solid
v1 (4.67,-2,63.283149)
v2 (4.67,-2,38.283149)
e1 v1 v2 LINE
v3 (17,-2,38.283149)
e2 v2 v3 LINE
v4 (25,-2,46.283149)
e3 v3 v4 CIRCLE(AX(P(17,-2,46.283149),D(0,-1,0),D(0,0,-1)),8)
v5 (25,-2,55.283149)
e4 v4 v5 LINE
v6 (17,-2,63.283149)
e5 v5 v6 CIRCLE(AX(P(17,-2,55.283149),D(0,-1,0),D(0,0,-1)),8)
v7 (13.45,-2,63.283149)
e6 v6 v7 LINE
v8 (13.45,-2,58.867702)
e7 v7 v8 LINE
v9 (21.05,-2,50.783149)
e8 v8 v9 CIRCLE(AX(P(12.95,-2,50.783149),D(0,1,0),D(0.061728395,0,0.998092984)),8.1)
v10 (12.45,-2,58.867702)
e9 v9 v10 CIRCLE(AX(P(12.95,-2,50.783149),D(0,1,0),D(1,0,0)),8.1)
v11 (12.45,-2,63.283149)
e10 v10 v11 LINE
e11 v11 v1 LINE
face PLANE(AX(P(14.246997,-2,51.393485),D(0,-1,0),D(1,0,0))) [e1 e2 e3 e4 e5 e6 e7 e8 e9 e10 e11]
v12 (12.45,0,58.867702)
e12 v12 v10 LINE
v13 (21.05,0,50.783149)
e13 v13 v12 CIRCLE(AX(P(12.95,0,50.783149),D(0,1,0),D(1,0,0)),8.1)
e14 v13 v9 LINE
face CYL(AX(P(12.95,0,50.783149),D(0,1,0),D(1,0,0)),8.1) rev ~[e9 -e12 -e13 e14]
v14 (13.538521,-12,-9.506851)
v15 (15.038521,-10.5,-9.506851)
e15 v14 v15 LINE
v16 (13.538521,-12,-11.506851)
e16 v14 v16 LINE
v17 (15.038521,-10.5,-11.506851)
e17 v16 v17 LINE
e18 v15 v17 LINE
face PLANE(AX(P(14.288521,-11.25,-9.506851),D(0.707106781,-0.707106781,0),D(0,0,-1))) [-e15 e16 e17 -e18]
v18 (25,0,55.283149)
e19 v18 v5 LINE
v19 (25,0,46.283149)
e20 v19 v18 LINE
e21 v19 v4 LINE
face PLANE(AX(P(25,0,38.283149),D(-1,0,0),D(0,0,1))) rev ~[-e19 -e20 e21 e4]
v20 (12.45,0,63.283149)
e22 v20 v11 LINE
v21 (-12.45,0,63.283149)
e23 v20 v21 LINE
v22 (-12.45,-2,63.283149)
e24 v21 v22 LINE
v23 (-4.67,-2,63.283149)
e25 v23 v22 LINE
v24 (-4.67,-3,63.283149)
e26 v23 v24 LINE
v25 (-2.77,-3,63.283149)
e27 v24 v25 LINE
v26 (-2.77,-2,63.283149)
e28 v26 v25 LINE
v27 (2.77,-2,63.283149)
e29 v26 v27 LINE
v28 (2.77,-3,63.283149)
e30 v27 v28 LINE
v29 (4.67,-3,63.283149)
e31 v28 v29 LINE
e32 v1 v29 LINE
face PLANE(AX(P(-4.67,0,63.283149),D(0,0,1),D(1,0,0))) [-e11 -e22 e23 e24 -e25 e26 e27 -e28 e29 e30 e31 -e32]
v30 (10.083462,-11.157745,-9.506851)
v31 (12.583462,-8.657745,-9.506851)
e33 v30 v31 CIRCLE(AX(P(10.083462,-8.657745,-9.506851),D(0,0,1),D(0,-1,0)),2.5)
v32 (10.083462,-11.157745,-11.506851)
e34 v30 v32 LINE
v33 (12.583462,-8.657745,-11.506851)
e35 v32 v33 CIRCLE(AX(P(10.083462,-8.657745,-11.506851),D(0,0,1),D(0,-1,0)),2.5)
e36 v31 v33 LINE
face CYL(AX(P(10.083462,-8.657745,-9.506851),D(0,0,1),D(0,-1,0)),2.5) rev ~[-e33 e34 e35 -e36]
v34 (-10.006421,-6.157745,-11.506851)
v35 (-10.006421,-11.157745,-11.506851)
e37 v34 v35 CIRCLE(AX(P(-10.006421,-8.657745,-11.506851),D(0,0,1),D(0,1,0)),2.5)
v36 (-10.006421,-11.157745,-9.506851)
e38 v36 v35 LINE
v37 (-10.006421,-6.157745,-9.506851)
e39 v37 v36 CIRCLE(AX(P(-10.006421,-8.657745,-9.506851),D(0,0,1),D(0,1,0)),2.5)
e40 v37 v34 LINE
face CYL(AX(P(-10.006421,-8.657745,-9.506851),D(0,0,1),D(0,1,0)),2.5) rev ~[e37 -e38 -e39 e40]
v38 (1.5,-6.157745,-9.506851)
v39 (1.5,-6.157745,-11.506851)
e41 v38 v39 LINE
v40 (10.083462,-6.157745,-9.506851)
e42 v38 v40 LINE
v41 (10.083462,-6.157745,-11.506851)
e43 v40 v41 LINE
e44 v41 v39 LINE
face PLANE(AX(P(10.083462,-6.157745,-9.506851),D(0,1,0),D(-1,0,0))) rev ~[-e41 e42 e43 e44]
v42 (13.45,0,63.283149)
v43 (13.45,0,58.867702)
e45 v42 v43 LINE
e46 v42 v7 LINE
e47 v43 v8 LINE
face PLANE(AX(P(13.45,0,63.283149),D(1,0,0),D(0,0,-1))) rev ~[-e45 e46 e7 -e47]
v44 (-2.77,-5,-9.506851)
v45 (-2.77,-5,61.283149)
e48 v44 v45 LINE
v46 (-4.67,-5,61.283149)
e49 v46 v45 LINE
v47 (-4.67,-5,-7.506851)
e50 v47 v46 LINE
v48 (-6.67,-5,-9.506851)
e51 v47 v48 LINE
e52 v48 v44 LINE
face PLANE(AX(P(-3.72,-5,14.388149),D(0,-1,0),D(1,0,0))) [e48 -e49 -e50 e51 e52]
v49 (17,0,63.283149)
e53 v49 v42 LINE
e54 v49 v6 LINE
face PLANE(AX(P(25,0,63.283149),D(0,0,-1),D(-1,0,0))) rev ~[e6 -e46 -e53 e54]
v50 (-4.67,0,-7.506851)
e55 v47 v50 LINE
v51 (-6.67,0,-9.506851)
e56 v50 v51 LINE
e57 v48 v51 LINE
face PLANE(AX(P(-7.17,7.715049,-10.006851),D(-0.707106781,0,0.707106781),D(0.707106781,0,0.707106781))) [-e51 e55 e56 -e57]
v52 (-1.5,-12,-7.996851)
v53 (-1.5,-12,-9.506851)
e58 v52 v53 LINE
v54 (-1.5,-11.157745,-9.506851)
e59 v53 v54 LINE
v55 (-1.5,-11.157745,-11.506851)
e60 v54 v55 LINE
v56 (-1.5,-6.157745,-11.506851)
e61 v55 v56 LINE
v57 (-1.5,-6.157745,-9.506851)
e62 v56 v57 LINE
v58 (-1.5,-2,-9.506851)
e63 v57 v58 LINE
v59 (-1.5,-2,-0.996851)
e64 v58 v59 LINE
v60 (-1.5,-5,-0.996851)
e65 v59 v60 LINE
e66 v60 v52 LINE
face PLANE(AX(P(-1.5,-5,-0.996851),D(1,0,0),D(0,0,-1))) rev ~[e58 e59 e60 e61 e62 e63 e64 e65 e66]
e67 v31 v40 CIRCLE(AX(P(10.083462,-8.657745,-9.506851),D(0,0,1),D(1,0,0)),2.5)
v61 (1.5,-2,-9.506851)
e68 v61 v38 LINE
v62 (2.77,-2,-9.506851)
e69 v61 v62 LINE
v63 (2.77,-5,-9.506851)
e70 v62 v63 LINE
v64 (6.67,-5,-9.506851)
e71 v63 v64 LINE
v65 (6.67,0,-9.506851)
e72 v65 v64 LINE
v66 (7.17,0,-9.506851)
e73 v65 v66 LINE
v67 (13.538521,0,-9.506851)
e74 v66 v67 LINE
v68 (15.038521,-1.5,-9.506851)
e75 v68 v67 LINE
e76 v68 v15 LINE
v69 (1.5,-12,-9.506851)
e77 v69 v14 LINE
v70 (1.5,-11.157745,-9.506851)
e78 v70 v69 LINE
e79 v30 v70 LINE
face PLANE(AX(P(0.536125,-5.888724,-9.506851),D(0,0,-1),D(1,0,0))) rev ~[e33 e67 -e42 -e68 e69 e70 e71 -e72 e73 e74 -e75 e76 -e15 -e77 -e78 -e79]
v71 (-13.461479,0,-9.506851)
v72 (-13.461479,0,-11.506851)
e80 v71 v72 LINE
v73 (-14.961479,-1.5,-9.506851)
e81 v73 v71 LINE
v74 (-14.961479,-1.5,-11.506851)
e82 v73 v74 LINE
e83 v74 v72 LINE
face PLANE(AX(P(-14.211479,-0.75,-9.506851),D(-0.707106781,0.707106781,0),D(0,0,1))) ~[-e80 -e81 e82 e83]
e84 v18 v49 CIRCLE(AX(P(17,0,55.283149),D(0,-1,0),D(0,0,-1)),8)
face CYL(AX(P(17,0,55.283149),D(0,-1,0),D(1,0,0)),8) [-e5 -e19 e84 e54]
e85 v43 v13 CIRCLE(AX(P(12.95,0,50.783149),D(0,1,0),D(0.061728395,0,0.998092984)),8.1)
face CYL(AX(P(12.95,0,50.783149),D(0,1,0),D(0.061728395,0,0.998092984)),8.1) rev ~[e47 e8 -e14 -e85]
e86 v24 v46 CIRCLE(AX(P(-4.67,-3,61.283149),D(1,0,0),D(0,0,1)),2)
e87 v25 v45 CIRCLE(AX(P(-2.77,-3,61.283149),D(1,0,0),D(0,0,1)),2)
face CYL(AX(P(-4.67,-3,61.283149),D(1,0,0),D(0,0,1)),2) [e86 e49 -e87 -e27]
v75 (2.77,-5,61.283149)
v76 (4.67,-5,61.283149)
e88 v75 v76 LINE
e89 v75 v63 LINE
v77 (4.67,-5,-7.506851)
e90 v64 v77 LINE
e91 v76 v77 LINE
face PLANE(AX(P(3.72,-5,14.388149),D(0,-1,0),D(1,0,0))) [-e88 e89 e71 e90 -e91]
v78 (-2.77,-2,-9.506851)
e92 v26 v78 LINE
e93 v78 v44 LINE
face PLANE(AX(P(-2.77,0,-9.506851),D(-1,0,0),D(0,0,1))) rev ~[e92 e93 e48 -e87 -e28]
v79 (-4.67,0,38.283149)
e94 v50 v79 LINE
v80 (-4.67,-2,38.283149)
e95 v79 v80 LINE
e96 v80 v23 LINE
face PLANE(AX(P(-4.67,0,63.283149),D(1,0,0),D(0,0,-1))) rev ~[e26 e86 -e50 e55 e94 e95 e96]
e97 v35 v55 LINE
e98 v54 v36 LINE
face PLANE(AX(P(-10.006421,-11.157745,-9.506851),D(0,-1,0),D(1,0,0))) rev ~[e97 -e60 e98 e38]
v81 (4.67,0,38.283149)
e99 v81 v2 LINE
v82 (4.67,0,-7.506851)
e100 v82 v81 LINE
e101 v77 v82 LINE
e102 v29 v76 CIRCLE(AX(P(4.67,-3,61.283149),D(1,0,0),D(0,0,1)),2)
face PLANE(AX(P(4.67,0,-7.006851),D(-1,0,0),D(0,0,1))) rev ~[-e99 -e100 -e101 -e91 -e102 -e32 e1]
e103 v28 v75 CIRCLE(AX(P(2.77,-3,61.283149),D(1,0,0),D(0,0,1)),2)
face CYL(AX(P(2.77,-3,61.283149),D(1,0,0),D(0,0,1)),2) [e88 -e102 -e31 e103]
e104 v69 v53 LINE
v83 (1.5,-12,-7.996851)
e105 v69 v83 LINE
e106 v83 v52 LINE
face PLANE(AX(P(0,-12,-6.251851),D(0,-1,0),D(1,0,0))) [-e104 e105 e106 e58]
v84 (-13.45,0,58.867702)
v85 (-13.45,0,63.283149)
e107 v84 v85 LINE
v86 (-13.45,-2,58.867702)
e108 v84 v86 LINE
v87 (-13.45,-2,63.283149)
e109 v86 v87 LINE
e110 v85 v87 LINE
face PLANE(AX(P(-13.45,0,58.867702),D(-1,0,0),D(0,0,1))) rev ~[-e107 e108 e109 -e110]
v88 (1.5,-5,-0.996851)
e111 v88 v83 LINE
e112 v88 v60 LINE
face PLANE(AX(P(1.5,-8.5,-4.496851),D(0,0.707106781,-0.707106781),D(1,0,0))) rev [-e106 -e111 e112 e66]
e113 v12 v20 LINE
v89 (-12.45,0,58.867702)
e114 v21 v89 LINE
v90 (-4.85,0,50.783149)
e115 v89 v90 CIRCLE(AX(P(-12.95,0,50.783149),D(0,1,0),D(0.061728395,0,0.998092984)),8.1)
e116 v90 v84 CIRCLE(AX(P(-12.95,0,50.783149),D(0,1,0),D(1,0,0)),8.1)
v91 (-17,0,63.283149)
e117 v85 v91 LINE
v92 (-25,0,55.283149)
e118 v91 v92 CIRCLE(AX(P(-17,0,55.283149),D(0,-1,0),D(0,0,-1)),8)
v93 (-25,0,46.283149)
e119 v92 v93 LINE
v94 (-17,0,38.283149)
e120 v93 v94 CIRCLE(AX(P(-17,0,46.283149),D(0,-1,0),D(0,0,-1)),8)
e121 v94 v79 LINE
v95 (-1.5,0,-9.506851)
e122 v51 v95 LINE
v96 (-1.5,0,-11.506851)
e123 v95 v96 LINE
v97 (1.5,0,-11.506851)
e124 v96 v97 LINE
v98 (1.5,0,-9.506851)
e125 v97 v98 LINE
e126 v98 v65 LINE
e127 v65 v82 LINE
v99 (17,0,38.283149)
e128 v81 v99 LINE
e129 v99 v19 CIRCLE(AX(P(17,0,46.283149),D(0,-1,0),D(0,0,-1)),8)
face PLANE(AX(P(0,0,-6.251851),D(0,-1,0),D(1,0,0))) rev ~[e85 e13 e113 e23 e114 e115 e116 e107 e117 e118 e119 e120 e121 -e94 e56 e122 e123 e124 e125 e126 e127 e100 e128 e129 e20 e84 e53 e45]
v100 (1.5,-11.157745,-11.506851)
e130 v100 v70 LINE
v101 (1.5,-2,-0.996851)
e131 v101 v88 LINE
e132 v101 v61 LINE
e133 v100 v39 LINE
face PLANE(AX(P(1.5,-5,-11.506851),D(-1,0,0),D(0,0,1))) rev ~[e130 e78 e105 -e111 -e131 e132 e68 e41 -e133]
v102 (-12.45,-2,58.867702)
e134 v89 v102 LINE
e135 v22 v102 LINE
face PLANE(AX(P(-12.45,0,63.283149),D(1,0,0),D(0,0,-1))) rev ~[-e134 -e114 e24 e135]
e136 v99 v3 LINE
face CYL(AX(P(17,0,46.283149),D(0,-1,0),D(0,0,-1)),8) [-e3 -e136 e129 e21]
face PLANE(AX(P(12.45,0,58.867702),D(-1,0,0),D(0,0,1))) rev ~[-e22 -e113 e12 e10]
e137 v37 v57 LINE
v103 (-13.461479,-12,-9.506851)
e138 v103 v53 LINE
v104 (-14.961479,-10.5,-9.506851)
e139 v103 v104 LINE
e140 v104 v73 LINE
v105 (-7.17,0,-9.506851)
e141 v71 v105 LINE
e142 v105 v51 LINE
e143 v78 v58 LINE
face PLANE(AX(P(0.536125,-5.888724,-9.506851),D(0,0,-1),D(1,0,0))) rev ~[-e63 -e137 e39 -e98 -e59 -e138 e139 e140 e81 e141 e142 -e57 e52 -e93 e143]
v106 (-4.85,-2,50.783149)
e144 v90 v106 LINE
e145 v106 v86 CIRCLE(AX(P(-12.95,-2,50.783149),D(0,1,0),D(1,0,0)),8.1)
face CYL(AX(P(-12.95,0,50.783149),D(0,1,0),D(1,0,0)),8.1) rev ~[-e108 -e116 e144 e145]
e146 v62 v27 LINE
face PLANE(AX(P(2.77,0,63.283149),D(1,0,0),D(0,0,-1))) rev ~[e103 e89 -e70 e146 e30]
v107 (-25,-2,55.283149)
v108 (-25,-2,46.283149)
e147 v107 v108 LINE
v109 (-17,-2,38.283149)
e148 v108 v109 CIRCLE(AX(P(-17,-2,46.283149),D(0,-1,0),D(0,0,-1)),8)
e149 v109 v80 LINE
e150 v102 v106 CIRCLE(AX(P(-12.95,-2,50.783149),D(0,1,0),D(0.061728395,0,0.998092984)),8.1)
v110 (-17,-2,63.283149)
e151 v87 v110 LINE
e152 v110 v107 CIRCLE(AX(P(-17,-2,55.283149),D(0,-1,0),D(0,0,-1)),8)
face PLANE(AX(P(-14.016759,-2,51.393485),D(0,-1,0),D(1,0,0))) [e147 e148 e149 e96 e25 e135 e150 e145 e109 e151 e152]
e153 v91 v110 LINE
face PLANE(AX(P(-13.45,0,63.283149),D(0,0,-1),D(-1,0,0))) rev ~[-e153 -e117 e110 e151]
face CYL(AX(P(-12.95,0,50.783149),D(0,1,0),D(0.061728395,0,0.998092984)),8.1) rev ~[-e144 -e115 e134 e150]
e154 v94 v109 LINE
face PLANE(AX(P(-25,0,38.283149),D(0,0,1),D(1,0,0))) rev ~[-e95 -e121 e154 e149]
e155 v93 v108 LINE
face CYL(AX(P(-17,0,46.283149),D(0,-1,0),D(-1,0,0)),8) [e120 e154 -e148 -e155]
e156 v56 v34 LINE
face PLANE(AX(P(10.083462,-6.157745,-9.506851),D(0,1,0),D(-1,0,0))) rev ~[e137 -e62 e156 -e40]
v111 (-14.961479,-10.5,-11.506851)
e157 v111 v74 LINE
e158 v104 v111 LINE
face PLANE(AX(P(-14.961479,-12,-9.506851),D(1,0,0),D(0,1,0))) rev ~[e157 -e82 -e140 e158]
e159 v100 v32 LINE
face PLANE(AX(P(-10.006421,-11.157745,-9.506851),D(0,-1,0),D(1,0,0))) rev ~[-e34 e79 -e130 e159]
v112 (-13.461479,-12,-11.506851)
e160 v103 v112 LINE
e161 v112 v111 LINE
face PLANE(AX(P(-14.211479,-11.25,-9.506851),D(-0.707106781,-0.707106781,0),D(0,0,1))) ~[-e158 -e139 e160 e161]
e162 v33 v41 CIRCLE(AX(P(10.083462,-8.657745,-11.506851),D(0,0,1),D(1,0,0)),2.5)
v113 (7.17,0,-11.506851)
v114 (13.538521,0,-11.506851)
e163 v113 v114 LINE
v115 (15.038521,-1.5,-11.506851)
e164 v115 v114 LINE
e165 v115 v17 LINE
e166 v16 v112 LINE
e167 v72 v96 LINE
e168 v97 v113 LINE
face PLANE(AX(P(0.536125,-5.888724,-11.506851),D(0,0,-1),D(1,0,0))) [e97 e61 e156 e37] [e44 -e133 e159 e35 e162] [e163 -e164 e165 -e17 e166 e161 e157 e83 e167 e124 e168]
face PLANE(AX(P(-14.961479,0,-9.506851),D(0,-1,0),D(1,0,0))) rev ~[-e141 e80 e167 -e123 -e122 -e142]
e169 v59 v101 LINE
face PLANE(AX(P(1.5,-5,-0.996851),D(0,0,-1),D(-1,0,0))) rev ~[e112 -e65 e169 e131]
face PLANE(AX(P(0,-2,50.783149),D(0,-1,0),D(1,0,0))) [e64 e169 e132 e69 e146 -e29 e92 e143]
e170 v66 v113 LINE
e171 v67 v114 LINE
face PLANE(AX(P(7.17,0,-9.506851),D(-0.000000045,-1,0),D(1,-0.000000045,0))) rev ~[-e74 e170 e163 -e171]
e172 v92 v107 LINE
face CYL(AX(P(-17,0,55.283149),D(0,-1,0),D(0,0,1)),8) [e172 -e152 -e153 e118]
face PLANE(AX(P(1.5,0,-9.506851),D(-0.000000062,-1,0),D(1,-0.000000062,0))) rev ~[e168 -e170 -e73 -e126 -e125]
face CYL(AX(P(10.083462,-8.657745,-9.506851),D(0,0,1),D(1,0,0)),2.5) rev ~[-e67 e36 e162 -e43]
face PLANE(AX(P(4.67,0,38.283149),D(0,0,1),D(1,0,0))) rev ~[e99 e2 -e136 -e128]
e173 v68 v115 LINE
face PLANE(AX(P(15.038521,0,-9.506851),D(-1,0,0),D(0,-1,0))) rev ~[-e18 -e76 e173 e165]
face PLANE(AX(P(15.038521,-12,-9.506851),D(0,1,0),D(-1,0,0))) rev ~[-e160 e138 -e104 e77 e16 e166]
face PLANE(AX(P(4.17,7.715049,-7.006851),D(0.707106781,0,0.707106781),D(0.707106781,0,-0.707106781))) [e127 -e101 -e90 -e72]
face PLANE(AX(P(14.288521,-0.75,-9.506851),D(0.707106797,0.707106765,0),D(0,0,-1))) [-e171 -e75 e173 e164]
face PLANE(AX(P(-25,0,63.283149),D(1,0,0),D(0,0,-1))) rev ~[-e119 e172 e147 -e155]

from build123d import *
from build123d import SkipClean  # not in build123d's __all__

# Parameters (mm, degrees)
F1_DEPTH      = 2
F0_W          = 5.54
F0_H          = 25
F0_W_2        = 1.9
F0_W_3        = 2.5
F0_H_2        = 2.5
F2_DEPTH      = 5
F3_DEPTH      = 5
F4_DEPTH      = 7
F5_SIZE       = 7
F8_DEPTH      = 2
F9_SIZE       = 1.5
F10_SIZE      = 1.5
F11_SIZE      = 1.5
F12_R         = 8
F13_R         = 2
F14_T4_DEPTH  = 20.4300979278
F14_T10_DEPTH = 20.4300979278


# Not quite as in the source:
# - a fillet or chamfer that OpenCascade refuses, or shapes differently, is made with other operations: its cross-section is extruded or revolved along the edge and cut away or added
# - ends of sketch curves that miss each other by under 0.0002 mm in the source are joined
# - a feature names something its author has since deleted; it is built from what else it names


with BuildPart() as f1:
    # F0 (on Front) → F1 (new body)
    with BuildSketch(Plane.XZ):
        with BuildLine():
            Line((-25, 38.2831491688), (-4.67, 38.2831491688))
            Line((-4.67, 38.2831491688), (-4.67, 63.2831491688))
            Line((-4.67, 63.2831491688), (-12.45, 63.2831491688))
            Line((-12.45, 63.2831491688), (-12.45, 58.8677023414))
            ThreePointArc((-12.45, 58.8677023414), (-7.0483053281, 56.3311217715), (-4.85, 50.7831491688))
            ThreePointArc((-4.85, 50.7831491688), (-18.4979726027, 44.8814544969), (-13.45, 58.8677023414))
            Line((-13.45, 58.8677023414), (-13.45, 63.2831491688))
            Line((-13.45, 63.2831491688), (-25, 63.2831491688))
            Line((-25, 63.2831491688), (-25, 38.2831491688))
        make_face()
    extrude(amount=F1_DEPTH)



with BuildPart() as f1b:
    # F0 (on Front) → F1, piece 2 (new body)
    with BuildSketch(Plane.XZ):
        with BuildLine():
            Line((4.67, 38.2831491688), (25, 38.2831491688))
            Line((25, 38.2831491688), (25, 63.2831491688))
            Line((25, 63.2831491688), (13.45, 63.2831491688))
            Line((13.45, 63.2831491688), (13.45, 58.8677023414))
            ThreePointArc((13.45, 58.8677023414), (18.8516946719, 56.3311217715), (21.05, 50.7831491688))
            ThreePointArc((21.05, 50.7831491688), (7.4020273973, 44.8814544969), (12.45, 58.8677023414))
            Line((12.45, 58.8677023414), (12.45, 63.2831491688))
            Line((12.45, 63.2831491688), (4.67, 63.2831491688))
            Line((4.67, 63.2831491688), (4.67, 38.2831491688))
        make_face()
    extrude(amount=F1_DEPTH)


with BuildPart() as f1c:
    # F0 (on Front) → F1, piece 3 (new body)
    with BuildSketch(Plane.XZ):
        with Locations((0, 50.7831491688)):
            Rectangle(F0_W, F0_H)
        Polygon((2.77, -9.5068508312), (2.77, 38.2831491688), (-2.77, 38.2831491688), (-2.77, -9.5068508312), (-1.5, -9.5068508312), (-1.5, -0.9968508312), (1.5, -0.9968508312), (1.5, -9.5068508312), align=None)
    extrude(amount=F1_DEPTH)


with BuildPart() as f1_1:
    add(f1.part, clean=False)

    add(f1b.part)  # F2 merges F1b

    add(f1c.part)  # F2 merges F1c
    # F0 (on Front) → F2 (join)
    with BuildSketch(Plane.XZ):
        Polygon((-2.77, -9.5068508312), (-2.77, 38.2831491688), (-4.67, 38.2831491688), (-4.67, 0), (-4.67, -7.0068508312), (-4.67, -9.5068508312), align=None)
        Polygon((4.67, -7.0068508312), (4.67, 38.2831491688), (2.77, 38.2831491688), (2.77, -9.5068508312), (4.67, -9.5068508312), align=None)
        with Locations((3.72, 50.7831491688)):
            Rectangle(F0_W_2, F0_H)
        with Locations((-3.72, 50.7831491688)):
            Rectangle(F0_W_2, F0_H)
        with Locations((-5.92, -8.2568508312)):
            Rectangle(F0_W_3, F0_H_2)
        with Locations((5.92, -8.2568508312)):
            Rectangle(F0_W_3, F0_H_2)
    extrude(amount=F2_DEPTH)

    # F0 (on Front) → F3 (join)
    with BuildSketch(Plane.XZ):
        Polygon((1.5, -11.5068508312), (1.5, -9.5068508312), (1.5, -0.9968508312), (-1.5, -0.9968508312), (-1.5, -9.5068508312), (-1.5, -11.5068508312), align=None)
    extrude(amount=F3_DEPTH)

    # F4 (add): a face of the model
    f4_faces = [f1_1.faces().sort_by_distance(p)[0] for p in [
        (0, -5, -6.2518508312),
    ]]
    extrude(f4_faces, amount=F4_DEPTH)

    # F5
    f5_edges = [f1_1.edges().sort_by_distance(p)[0] for p in [
        (0, -12, -0.996851),
    ]]
    chamfer(f5_edges, length=F5_SIZE)

    # F7 (on face) → F8 (join)
    with BuildSketch(Plane(origin=(0, 0, -9.5068508312), x_dir=(1, 0, 0), z_dir=(0, 0, -1))):
        Polygon((15.0385206658, 12.000000352), (0.0385206658, 12.000000352), (-14.9614793342, 12.000000352), (-14.9614793342, 3.52e-07), (1.5, 3.52e-07), (1.5, 2), (2.77, 2), (2.77, 5), (7.17, 5), (7.17, 0), (15.0385206658, 3.52e-07), align=None)
        with BuildLine():
            ThreePointArc((-10.0064205471, 6.1577448677), (-12.5064205471, 8.6577448677), (-10.0064205471, 11.1577448677))
            Line((-10.0064205471, 11.1577448677), (10.0834618788, 11.1577448677))
            ThreePointArc((10.0834618788, 11.1577448677), (11.8512288318, 10.4255118207), (12.5834618788, 8.6577448677))
            ThreePointArc((12.5834618788, 8.6577448677), (11.8512288318, 6.8899779148), (10.0834618788, 6.1577448677))
            Line((10.0834618788, 6.1577448677), (-10.0064205471, 6.1577448677))
        make_face(mode=Mode.SUBTRACT)
        Polygon((1.5, 2), (1.5, 0), (7.17, 3.52e-07), (7.17, 5), (2.77, 5), (2.77, 2), align=None)
    with SkipClean():  # cleaning this boolean's faces spoils the solid; the shape is the same uncleaned
        extrude(amount=F8_DEPTH)

    # F9
    f9_edges = [f1_1.edges().sort_by_distance(p)[0] for p in [
        (15.038521, -12, -10.506851),
    ]]
    chamfer(f9_edges, length=F9_SIZE)

    # F10
    f10_edges = [f1_1.edges().sort_by_distance(p)[0] for p in [
        (-14.961479, -12, -10.506851),
    ]]
    chamfer(f10_edges, length=F10_SIZE)

    # F11
    f11_edges = [f1_1.edges().sort_by_distance(p)[0] for p in [
        (-14.961479, 0, -10.506851),
        (15.038521, 0, -10.506851),
    ]]
    chamfer(f11_edges, length=F11_SIZE)

    # F12
    f12_edges = [f1_1.edges().sort_by_distance(p)[0] for p in [
        (25, -1, 38.283149),
        (-25, -1, 38.283149),
        (-25, -1, 63.283149),
        (25, -1, 63.283149),
    ]]
    fillet(f12_edges, radius=F12_R)

    # F13
    f13_edges = [f1_1.edges().sort_by_distance(p)[0] for p in [
        (3.72, -5, 63.283149),
        (-3.72, -5, 63.283149),
    ]]
    fillet(f13_edges, radius=F13_R)

    # F14: chamfer of 3 on 2 edges, made by hand


with BuildPart() as f14_tool2:
    # F14_s3 → F14_t4 (new body)
    with BuildSketch(Plane.XZ.offset(-7.7150489639)):
        Polygon((4.17, -7.0068508312), (7.17, -10.0068508312), (7.17, -7.0068508312), align=None)
    extrude(amount=F14_T4_DEPTH)

    split(bisect_by=Plane.YZ.offset(4.67), keep=Keep.TOP)

    split(bisect_by=Plane.XY.offset(-9.5068508312), keep=Keep.TOP)


with BuildPart() as f1_2:
    add(f1_1.part, clean=False)

    # F14_t1: cut F14_tool2
    add(f14_tool2.part, mode=Mode.SUBTRACT)


with BuildPart() as f14_tool8:
    # F14_s9 → F14_t10 (new body)
    with BuildSketch(Plane.XZ.offset(-7.7150489639)):
        Polygon((-7.17, -10.0068508312), (-4.17, -7.0068508312), (-7.17, -7.0068508312), align=None)
    extrude(amount=F14_T10_DEPTH)

    split(bisect_by=Plane.YZ.offset(-4.67), keep=Keep.BOTTOM)

    split(bisect_by=Plane.XY.offset(-9.5068508312), keep=Keep.TOP)


with BuildPart() as f1_3:
    add(f1_2.part, clean=False)

    # F14_t7: cut F14_tool8
    add(f14_tool8.part, mode=Mode.SUBTRACT)


solid = f1_3.part
